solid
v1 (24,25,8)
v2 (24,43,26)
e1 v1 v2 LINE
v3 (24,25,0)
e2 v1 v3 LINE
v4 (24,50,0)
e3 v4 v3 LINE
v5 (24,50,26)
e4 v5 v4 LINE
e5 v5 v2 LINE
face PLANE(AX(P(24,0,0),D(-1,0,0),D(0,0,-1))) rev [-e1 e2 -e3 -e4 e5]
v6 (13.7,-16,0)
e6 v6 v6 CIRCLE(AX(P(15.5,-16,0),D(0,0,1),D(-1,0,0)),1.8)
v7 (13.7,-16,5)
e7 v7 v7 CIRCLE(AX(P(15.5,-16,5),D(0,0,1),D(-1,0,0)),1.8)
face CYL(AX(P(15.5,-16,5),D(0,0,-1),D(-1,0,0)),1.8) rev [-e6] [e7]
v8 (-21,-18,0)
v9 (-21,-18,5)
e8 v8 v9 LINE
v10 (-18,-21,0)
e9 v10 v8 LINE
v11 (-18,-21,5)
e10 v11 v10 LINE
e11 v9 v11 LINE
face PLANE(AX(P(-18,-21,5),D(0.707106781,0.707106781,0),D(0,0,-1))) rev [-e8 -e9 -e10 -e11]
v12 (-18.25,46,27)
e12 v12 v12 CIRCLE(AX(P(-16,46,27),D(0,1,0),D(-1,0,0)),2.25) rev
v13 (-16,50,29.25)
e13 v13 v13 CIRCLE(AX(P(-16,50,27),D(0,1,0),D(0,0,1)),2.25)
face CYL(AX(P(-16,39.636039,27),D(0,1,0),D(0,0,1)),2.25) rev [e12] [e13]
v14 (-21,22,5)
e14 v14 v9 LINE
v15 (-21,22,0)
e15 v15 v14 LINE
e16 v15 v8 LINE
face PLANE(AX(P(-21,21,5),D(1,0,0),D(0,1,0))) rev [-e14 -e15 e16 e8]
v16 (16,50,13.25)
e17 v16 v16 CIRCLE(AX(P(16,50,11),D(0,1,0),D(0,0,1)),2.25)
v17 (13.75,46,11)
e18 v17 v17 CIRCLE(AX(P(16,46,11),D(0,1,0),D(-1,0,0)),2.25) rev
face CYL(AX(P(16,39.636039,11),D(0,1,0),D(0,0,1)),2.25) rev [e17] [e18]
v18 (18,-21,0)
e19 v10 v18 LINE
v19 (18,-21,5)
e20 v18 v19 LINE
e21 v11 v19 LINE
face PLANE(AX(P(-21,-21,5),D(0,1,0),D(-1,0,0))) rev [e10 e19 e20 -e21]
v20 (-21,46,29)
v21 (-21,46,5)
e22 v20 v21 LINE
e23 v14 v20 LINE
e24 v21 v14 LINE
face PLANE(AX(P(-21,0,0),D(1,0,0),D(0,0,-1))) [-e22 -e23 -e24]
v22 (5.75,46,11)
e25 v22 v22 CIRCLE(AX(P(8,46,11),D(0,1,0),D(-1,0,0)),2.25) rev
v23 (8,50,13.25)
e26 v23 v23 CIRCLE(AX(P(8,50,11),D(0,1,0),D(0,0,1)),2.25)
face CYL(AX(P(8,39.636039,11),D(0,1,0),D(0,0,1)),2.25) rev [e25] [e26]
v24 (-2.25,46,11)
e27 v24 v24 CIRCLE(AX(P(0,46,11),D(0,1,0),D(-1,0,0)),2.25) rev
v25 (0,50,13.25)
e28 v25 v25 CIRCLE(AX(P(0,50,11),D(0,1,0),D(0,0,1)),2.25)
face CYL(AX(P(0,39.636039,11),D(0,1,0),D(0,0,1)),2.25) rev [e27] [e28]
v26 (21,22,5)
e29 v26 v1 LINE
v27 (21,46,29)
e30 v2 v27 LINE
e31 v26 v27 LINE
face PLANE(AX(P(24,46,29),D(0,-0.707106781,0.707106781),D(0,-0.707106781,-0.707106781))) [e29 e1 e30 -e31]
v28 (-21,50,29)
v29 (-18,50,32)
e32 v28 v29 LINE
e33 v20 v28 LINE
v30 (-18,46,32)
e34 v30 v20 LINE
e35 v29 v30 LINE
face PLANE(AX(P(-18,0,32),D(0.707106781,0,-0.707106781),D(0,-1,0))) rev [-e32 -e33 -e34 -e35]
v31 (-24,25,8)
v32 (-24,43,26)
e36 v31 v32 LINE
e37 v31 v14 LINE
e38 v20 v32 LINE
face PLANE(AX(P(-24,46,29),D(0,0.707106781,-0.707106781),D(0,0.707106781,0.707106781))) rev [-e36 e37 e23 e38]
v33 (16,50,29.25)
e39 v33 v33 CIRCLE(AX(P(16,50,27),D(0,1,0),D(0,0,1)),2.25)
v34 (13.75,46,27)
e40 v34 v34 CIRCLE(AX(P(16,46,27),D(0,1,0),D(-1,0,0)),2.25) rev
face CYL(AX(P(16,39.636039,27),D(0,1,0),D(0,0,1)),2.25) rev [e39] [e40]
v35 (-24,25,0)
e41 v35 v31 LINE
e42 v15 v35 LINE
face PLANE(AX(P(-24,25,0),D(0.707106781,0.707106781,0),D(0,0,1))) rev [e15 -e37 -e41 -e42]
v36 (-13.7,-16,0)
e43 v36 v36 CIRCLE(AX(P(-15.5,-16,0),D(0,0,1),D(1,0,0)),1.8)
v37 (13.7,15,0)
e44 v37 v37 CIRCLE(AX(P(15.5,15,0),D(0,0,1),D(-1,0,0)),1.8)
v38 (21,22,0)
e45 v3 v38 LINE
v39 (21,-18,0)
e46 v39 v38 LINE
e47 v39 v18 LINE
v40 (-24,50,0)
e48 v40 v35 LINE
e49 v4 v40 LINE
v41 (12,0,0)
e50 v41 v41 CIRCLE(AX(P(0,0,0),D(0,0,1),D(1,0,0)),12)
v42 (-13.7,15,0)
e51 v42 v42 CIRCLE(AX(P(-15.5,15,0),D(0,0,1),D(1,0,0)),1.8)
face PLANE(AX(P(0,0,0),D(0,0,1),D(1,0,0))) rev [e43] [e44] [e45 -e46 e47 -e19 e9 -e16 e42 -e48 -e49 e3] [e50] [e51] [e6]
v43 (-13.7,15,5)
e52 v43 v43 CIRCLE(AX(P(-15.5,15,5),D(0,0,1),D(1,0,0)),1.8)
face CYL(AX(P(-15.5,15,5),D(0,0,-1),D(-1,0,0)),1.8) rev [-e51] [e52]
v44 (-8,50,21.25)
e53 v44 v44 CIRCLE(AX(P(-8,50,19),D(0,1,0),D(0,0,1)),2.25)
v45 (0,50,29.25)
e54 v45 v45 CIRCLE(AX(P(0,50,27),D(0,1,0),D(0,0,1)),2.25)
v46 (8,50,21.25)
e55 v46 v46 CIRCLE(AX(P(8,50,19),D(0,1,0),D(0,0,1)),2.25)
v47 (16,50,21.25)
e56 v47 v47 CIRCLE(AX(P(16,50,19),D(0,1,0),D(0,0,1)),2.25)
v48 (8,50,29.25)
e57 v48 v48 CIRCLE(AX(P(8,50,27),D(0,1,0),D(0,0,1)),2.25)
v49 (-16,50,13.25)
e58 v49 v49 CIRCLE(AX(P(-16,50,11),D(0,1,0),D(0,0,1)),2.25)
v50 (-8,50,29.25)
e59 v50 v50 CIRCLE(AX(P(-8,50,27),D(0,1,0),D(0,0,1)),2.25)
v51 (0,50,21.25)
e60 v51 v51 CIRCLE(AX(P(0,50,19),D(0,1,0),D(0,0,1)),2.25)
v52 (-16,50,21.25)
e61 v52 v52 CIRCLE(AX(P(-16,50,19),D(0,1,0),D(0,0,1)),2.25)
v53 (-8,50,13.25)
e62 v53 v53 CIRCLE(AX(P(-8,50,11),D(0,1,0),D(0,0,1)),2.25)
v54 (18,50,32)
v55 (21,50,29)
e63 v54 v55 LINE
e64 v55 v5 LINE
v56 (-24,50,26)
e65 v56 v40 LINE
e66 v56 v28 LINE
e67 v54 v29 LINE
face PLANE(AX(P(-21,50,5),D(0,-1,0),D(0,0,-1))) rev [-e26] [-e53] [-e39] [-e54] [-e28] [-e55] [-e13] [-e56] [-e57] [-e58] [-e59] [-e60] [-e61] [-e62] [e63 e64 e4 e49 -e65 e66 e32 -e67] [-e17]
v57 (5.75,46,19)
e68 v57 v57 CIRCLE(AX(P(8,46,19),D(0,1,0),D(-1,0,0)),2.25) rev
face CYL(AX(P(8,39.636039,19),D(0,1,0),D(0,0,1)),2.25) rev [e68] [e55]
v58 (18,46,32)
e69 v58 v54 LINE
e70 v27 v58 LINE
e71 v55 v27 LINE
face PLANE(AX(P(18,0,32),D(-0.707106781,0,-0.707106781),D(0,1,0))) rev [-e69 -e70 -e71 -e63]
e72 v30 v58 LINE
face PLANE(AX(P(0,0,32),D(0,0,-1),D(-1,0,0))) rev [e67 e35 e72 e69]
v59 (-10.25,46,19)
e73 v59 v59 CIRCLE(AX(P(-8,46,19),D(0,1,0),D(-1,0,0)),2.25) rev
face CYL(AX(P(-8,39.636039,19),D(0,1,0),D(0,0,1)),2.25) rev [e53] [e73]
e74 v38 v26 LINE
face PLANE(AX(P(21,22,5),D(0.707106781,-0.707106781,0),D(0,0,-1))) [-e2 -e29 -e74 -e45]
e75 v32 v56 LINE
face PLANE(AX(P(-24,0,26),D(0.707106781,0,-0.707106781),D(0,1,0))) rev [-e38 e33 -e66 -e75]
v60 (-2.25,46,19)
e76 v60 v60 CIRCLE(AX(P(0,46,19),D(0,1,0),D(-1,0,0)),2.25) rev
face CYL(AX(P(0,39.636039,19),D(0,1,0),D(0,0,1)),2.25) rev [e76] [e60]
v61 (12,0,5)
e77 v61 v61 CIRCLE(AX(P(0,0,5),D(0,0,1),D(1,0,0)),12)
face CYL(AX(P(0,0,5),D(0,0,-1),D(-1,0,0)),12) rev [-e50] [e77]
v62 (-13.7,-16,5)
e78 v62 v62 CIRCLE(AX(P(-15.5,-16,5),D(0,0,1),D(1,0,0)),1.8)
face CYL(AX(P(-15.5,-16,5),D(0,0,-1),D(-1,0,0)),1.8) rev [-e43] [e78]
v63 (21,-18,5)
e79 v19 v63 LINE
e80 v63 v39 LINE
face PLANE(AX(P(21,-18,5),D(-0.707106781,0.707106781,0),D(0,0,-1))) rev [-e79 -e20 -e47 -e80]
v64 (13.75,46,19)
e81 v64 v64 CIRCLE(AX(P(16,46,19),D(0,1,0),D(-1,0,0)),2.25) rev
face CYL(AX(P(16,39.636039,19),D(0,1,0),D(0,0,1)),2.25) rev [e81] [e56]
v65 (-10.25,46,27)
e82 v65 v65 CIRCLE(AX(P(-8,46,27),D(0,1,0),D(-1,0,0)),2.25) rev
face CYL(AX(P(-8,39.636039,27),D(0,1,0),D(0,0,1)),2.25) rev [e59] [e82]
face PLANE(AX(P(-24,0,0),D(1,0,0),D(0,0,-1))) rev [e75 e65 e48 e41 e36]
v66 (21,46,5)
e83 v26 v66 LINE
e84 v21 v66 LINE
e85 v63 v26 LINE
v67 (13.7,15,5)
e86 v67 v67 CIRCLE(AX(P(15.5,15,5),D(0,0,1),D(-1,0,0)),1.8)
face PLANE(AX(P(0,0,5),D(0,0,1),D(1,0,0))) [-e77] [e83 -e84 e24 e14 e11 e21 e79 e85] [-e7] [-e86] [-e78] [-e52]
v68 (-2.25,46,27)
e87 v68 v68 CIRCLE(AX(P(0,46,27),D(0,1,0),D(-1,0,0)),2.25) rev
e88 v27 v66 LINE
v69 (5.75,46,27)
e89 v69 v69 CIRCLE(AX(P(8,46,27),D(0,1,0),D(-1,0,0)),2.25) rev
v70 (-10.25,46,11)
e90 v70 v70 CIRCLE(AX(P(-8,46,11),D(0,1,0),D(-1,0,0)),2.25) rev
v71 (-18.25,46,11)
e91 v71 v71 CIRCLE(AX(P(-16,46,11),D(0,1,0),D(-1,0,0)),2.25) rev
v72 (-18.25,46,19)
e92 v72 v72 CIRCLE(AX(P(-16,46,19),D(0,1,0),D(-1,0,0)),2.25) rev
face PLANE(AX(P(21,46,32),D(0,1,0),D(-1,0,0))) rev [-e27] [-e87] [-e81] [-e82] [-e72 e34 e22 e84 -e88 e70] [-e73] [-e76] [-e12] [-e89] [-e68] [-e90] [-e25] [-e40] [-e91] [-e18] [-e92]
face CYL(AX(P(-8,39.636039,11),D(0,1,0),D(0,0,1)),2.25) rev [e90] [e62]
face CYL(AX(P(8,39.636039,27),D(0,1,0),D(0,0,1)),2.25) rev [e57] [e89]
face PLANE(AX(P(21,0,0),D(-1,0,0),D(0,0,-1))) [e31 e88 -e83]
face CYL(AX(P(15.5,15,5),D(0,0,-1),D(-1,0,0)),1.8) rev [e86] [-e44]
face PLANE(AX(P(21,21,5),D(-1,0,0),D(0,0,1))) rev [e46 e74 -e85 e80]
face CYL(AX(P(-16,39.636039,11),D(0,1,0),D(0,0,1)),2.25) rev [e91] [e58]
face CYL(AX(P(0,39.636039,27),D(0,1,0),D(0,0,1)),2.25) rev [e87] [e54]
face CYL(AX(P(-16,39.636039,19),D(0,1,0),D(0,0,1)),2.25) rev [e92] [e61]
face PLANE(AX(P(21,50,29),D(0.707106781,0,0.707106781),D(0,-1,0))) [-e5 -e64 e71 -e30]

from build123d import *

# Parameters (mm, degrees)
SKETCH_1_R          = 1.8
SKETCH_1_R_2        = 12
EXTRUDE_1_DEPTH     = 5
SKETCH_4_W          = 42
SKETCH_4_H          = 4
EXTRUDE_2_DEPTH     = 27
SKETCH_5_R          = 2.25
CUT_EXTRUDE_1_DEPTH = 4
CHAMFER_1_SIZE      = 3
EXTRUDE_3_DEPTH     = 3
CHAMFER_2_SIZE      = 3


with BuildPart() as part:
    # 草图1 → 凸台-拉伸1 (new body)
    with BuildSketch(Plane.XY):
        Polygon((-21, 21), (-21, -21), (21, -21), (21, 21), (21, 50), (-21, 50), align=None)
        with Locations((-15.5, -16)):
            Circle(SKETCH_1_R, mode=Mode.SUBTRACT)
        with Locations((-15.5, 15)):
            Circle(SKETCH_1_R, mode=Mode.SUBTRACT)
        with Locations(Location((15.5, -16, 0), (0, 0, 180))):
            Circle(SKETCH_1_R, mode=Mode.SUBTRACT)
        with Locations(Location((15.5, 15, 0), (0, 0, 180))):
            Circle(SKETCH_1_R, mode=Mode.SUBTRACT)
        Circle(SKETCH_1_R_2, mode=Mode.SUBTRACT)
    extrude(amount=EXTRUDE_1_DEPTH)

    # 草图4 → 凸台-拉伸2 (add)
    with BuildSketch(Plane.XY.offset(5)):
        with Locations((0, 48)):
            Rectangle(SKETCH_4_W, SKETCH_4_H)
    extrude(amount=EXTRUDE_2_DEPTH)

    # 草图5 → 切除-拉伸1 (cut)
    with BuildSketch(Plane(origin=(0, 50, 0), x_dir=(1, 0, 0), z_dir=(0, 1, 0))):
        with Locations(Location((-16, -27, 0), (0, 0, 270))):
            Circle(SKETCH_5_R)
        with Locations(Location((-8, -27, 0), (0, 0, 270))):
            Circle(SKETCH_5_R)
        with Locations(Location((0, -27, 0), (0, 0, 270))):
            Circle(SKETCH_5_R)
        with Locations(Location((8, -27, 0), (0, 0, 270))):
            Circle(SKETCH_5_R)
        with Locations(Location((16, -27, 0), (0, 0, 270))):
            Circle(SKETCH_5_R)
        with Locations(Location((-16, -19, 0), (0, 0, 270))):
            Circle(SKETCH_5_R)
        with Locations(Location((-8, -19, 0), (0, 0, 270))):
            Circle(SKETCH_5_R)
        with Locations(Location((0, -19, 0), (0, 0, 270))):
            Circle(SKETCH_5_R)
        with Locations(Location((8, -19, 0), (0, 0, 270))):
            Circle(SKETCH_5_R)
        with Locations(Location((16, -19, 0), (0, 0, 270))):
            Circle(SKETCH_5_R)
        with Locations(Location((-16, -11, 0), (0, 0, 270))):
            Circle(SKETCH_5_R)
        with Locations(Location((-8, -11, 0), (0, 0, 270))):
            Circle(SKETCH_5_R)
        with Locations(Location((0, -11, 0), (0, 0, 270))):
            Circle(SKETCH_5_R)
        with Locations(Location((8, -11, 0), (0, 0, 270))):
            Circle(SKETCH_5_R)
        with Locations(Location((16, -11, 0), (0, 0, 270))):
            Circle(SKETCH_5_R)
    extrude(amount=-CUT_EXTRUDE_1_DEPTH, mode=Mode.SUBTRACT)

    # 倒角1
    chamfer_1_edges = [part.edges().sort_by_distance(p)[0] for p in [
        (21, -21, 2.5),
        (-21, -21, 2.5),
        (21, 48, 32),
        (-21, 48, 32),
    ]]
    chamfer(chamfer_1_edges, length=CHAMFER_1_SIZE)

    # 草图7 → 凸台-拉伸3 (add)
    with BuildSketch(Plane.ZY.offset(21)):
        Polygon((29, 46), (5, 22), (0, 22), (0, 50), (29, 50), align=None)
    extrude_3 = extrude(amount=EXTRUDE_3_DEPTH)

    # 镜向1: 凸台-拉伸3 across plane
    add(extrude_3.mirror(Plane(origin=(0, 0, 0), x_dir=(0, 0, 1), z_dir=(1, 0, 0))))

    # 倒角2
    chamfer_2_edges = [part.edges().sort_by_distance(p)[0] for p in [
        (24, 22, 2.5),
        (24, 48, 29),
        (-24, 48, 29),
        (-24, 22, 2.5),
    ]]
    chamfer(chamfer_2_edges, length=CHAMFER_2_SIZE - 0.0001)  # a hair under: the kernel refuses the full size


solid = part.part
